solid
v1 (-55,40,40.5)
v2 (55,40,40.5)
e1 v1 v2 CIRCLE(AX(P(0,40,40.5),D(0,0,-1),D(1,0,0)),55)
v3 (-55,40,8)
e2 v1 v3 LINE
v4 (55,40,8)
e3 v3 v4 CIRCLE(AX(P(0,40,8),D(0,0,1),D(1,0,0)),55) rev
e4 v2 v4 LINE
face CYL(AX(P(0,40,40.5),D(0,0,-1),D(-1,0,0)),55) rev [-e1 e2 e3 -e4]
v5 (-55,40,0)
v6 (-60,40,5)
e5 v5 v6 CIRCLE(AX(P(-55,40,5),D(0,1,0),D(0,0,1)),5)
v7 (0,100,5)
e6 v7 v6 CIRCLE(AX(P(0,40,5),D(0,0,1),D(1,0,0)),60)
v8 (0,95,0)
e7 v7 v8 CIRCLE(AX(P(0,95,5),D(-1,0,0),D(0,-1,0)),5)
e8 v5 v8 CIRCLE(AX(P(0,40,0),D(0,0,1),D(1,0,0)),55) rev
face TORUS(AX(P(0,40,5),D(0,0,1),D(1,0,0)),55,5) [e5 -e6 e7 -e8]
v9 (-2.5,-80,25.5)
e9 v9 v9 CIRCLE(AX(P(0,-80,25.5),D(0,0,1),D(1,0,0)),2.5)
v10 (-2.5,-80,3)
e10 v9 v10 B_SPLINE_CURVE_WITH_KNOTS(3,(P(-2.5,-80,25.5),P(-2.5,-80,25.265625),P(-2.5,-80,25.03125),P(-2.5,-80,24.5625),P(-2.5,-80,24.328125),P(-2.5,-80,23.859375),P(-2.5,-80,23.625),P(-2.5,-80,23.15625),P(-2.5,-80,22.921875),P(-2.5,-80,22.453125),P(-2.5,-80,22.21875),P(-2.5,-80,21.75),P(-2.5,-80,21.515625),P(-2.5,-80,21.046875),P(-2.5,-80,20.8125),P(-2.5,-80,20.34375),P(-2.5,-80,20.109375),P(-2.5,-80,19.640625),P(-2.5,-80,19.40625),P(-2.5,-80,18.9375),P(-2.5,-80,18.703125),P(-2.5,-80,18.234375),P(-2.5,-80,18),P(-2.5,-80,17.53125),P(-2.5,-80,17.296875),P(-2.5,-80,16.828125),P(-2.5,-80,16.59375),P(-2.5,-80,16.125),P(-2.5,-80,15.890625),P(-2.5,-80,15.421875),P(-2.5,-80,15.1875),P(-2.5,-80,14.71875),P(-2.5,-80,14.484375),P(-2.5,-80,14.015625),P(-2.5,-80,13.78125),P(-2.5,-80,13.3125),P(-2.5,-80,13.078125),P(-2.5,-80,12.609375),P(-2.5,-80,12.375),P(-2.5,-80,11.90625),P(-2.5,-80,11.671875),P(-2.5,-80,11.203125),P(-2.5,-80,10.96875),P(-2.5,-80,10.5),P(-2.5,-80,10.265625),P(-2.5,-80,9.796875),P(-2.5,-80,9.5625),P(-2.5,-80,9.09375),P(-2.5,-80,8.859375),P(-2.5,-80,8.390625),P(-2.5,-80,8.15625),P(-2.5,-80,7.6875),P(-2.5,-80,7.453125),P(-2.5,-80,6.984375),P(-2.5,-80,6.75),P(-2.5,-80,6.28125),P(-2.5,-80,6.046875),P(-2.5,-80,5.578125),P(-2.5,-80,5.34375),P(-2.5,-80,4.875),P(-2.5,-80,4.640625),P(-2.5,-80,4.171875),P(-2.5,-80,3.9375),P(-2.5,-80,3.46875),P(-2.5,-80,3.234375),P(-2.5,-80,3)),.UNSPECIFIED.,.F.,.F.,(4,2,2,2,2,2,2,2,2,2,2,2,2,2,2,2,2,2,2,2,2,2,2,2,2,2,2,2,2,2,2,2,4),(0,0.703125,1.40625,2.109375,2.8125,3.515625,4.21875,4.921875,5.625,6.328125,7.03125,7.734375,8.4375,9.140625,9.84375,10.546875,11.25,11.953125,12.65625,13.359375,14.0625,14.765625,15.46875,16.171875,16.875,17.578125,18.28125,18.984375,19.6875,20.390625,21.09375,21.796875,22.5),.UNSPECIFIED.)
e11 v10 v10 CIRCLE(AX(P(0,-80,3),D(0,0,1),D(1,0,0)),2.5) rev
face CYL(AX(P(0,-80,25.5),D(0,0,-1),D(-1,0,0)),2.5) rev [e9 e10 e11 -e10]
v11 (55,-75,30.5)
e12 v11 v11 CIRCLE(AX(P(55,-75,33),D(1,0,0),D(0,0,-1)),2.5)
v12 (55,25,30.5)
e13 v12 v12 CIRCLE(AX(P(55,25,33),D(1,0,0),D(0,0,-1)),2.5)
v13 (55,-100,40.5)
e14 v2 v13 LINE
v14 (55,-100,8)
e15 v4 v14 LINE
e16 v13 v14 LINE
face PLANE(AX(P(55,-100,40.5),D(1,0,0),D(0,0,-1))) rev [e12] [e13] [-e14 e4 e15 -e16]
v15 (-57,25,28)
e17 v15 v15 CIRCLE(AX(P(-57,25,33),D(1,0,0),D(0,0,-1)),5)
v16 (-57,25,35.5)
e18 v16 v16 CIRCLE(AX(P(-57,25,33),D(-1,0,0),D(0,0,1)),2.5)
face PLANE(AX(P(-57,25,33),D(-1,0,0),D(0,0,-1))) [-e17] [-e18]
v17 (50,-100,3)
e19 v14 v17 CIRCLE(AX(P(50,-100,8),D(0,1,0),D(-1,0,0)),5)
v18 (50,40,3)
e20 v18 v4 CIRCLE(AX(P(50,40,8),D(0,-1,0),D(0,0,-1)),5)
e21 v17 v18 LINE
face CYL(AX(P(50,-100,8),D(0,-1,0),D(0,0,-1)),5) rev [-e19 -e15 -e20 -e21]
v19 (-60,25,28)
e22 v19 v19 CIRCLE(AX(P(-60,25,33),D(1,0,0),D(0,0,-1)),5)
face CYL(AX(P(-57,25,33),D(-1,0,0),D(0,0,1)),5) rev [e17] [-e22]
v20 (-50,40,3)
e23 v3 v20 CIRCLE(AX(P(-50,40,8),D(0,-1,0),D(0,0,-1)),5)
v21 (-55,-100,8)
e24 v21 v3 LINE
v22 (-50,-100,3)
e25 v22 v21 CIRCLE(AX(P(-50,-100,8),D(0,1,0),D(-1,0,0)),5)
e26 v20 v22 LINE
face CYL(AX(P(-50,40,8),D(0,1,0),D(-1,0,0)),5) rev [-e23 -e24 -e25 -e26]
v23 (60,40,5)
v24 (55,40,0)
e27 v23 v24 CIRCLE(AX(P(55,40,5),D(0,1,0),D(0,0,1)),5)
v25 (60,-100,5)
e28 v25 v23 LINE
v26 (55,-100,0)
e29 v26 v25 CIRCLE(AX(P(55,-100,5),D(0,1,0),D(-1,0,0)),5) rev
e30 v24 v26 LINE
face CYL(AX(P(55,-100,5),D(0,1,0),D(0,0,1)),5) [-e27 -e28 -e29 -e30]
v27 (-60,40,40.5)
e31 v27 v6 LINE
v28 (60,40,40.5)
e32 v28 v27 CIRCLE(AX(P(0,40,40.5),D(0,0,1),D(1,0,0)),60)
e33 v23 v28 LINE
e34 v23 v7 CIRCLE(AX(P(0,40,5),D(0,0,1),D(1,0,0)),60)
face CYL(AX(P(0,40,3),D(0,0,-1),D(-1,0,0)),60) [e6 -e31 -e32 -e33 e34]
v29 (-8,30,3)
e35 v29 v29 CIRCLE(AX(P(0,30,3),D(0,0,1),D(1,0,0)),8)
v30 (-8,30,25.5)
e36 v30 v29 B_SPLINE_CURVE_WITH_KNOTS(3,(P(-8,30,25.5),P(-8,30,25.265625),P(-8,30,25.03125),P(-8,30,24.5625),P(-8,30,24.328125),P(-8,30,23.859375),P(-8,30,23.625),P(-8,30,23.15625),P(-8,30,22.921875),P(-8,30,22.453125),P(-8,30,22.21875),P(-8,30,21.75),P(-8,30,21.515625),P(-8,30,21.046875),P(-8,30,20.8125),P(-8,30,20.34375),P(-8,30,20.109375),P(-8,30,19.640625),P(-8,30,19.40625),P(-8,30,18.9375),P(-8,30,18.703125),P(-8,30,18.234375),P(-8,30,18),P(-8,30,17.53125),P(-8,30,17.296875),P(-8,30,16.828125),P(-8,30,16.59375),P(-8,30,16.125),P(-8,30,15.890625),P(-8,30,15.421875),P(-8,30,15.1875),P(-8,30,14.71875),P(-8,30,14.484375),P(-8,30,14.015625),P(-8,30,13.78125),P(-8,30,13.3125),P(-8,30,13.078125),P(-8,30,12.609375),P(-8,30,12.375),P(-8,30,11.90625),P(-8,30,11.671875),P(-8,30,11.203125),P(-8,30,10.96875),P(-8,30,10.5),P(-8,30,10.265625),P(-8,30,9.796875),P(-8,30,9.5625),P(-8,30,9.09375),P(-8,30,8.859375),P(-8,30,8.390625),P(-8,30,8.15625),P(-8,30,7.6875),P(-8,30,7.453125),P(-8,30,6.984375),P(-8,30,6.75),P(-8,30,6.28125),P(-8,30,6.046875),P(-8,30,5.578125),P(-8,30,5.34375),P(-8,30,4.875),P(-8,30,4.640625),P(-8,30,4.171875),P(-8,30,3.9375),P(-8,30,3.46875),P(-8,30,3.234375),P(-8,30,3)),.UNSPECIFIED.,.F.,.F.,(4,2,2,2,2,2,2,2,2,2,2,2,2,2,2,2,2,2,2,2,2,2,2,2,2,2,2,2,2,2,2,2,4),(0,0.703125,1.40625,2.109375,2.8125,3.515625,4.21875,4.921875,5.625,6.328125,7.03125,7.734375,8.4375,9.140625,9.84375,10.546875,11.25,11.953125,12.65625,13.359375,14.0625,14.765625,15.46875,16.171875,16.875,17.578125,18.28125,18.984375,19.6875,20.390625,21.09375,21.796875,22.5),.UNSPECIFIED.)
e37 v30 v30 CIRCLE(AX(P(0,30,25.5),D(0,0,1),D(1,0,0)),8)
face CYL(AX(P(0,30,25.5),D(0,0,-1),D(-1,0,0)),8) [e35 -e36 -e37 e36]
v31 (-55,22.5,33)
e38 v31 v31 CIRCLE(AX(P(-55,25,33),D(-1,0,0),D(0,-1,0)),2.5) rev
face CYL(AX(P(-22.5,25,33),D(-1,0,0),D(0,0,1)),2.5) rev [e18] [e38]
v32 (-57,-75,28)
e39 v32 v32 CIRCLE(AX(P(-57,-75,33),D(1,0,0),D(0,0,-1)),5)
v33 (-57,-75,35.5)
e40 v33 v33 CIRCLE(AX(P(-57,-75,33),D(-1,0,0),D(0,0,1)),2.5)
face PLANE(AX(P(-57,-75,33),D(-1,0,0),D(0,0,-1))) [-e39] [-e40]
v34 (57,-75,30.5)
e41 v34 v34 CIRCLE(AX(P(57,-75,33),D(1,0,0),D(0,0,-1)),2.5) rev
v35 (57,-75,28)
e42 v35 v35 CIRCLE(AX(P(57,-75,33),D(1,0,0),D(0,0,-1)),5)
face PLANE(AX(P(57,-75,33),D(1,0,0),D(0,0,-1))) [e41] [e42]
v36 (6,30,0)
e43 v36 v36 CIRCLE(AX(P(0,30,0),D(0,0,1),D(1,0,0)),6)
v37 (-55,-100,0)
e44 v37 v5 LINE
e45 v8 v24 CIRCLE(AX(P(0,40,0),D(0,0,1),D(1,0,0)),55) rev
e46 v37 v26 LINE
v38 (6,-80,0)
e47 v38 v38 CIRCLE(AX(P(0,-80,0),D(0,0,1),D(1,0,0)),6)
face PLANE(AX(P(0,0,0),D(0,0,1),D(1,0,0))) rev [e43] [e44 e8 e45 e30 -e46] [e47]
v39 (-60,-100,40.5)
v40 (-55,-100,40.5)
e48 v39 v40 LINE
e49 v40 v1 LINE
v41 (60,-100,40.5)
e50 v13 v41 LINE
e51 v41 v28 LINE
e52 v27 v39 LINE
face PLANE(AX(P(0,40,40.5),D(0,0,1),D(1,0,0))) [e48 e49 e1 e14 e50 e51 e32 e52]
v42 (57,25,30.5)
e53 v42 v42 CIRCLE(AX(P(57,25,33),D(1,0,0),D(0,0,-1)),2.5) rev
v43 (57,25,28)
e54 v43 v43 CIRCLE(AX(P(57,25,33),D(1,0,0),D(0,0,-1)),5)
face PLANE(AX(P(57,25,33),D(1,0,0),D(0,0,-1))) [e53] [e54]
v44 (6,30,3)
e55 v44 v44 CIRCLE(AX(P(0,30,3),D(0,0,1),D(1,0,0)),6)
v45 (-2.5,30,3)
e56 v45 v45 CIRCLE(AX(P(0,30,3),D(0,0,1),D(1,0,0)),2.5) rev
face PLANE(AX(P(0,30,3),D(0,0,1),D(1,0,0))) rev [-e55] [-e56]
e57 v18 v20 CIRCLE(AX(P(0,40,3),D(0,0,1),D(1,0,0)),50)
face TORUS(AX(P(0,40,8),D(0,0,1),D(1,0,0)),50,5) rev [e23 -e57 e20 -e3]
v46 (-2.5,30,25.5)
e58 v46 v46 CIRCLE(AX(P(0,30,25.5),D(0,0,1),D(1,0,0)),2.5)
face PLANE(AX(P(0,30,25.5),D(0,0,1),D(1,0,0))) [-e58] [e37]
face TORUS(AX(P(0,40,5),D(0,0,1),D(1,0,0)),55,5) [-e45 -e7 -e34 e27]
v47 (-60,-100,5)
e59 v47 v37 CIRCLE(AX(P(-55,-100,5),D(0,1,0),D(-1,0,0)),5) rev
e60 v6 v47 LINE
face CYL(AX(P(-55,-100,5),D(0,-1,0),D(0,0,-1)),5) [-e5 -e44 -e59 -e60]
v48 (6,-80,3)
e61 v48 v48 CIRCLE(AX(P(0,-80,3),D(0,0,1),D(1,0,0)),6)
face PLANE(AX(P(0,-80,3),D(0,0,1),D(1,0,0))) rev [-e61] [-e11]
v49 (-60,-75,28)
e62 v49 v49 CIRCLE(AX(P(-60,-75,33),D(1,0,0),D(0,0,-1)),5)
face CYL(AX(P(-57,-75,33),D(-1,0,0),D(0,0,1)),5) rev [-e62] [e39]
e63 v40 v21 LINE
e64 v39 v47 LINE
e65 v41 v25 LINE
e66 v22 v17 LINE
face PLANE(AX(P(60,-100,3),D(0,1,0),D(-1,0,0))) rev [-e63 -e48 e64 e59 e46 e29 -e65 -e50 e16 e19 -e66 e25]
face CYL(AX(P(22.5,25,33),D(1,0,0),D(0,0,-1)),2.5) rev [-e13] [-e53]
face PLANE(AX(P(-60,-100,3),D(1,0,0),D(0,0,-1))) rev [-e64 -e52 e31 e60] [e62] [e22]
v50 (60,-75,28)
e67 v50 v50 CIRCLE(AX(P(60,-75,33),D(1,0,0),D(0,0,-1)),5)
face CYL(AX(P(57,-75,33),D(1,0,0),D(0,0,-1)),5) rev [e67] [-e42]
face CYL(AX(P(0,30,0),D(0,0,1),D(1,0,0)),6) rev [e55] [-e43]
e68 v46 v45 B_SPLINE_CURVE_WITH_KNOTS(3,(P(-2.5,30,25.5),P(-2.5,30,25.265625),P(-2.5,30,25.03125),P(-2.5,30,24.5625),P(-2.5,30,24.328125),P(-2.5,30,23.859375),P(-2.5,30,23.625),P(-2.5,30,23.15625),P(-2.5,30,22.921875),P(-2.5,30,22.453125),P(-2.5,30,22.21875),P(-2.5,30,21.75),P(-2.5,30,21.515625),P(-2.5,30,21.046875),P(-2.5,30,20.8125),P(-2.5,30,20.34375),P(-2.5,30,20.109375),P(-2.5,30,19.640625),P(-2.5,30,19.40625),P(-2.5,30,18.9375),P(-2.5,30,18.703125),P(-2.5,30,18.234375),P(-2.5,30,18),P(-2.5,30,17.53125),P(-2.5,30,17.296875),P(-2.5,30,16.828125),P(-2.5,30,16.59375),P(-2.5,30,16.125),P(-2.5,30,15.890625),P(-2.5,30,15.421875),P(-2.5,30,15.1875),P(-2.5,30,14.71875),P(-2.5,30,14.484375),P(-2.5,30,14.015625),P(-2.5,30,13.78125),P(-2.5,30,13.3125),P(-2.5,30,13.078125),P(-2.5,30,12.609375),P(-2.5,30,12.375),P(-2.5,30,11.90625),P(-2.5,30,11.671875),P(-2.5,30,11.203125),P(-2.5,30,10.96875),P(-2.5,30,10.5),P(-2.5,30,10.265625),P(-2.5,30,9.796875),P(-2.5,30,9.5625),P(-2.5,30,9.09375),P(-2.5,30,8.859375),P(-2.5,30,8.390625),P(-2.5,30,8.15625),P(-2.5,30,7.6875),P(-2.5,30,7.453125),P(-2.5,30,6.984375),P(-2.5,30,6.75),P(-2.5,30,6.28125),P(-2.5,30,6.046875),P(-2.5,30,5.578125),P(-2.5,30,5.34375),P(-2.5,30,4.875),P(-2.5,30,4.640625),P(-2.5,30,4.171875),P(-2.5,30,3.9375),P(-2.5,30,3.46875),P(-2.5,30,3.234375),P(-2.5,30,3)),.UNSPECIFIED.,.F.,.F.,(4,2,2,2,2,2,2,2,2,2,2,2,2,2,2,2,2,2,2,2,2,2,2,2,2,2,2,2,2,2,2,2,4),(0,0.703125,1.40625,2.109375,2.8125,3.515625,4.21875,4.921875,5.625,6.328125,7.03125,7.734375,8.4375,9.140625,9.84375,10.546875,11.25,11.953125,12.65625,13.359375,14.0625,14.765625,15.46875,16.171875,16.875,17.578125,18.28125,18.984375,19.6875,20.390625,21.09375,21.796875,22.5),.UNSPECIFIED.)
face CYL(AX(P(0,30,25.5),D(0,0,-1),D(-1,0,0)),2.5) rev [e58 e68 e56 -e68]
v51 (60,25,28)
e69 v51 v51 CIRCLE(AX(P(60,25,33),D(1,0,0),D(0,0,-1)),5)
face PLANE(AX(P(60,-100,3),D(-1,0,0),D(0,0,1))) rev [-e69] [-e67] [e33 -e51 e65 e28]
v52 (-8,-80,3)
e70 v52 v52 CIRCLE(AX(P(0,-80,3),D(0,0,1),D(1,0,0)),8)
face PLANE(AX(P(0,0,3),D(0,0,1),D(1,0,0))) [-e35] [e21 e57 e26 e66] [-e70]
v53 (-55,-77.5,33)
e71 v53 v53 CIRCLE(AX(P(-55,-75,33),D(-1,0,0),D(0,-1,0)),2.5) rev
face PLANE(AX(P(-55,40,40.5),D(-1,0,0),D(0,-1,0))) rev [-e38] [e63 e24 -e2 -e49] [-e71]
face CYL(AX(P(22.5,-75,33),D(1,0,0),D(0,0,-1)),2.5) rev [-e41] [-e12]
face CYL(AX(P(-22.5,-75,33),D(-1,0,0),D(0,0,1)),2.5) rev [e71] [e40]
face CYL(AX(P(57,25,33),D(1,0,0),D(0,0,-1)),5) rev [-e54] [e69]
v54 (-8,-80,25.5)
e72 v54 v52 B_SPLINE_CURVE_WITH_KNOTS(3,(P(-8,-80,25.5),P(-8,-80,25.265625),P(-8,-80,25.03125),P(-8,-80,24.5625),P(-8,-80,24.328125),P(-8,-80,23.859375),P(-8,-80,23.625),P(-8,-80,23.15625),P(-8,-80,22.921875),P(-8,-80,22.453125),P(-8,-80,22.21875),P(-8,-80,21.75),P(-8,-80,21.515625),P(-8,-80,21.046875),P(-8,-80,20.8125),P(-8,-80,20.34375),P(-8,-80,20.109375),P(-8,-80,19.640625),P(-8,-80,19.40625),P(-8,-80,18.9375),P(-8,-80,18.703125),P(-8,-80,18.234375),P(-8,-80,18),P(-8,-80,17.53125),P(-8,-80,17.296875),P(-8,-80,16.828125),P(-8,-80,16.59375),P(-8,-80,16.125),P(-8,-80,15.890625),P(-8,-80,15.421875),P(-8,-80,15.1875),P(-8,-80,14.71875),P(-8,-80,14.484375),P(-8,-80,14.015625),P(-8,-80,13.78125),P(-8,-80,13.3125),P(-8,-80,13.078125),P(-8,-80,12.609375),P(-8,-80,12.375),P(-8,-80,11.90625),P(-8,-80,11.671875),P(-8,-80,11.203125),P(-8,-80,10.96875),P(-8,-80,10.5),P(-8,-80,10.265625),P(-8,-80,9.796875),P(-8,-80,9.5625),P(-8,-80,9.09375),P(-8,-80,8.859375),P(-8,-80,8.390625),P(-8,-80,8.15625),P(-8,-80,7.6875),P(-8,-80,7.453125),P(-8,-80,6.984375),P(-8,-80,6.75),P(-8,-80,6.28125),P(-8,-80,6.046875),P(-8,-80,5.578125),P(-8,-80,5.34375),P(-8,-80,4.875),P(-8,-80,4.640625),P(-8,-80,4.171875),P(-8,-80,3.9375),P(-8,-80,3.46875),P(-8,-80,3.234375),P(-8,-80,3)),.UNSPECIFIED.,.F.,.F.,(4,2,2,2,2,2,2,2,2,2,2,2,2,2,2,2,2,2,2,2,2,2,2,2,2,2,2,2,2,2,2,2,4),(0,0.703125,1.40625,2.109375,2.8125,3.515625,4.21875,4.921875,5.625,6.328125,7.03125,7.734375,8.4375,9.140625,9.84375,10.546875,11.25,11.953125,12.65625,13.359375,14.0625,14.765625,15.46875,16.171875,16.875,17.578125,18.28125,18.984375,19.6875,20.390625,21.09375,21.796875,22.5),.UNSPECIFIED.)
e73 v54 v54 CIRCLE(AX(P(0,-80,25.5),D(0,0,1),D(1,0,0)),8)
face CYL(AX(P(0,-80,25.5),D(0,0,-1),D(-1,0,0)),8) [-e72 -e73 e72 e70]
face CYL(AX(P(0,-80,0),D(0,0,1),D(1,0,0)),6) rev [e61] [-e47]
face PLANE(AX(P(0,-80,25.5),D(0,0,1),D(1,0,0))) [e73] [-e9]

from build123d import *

# Parameters (mm, degrees)
SKETCH1_W           = 120
SKETCH1_H           = 200
BOSS_EXTRUDE1_DEPTH = 3
FILLET1_R           = 60
BOSS_EXTRUDE2_DEPTH = 37.5
FILLET2_R           = 5
SKETCH6_R           = 2.5
CUT_EXTRUDE1_DEPTH  = 37.5
SKETCH7_R           = 5
CUT_EXTRUDE2_DEPTH  = 3
SKETCH9_R           = 8
SKETCH9_R_2         = 2.5
BOSS_EXTRUDE3_DEPTH = 22.5
SKETCH10_R          = 6
CUT_EXTRUDE3_DEPTH  = 3
LPATTERN1_COUNT     = 2
LPATTERN1_PITCH     = 110


with BuildPart() as part:
    # Sketch1 → Boss-Extrude1 (new body)
    with BuildSketch(Plane.XY):
        Rectangle(SKETCH1_W, SKETCH1_H)
    extrude(amount=BOSS_EXTRUDE1_DEPTH)

    # Fillet1
    fillet1_edges = [part.edges().sort_by_distance(p)[0] for p in [
        (60, 100, 1.5),
        (-60, 100, 1.5),
    ]]
    fillet(fillet1_edges, radius=FILLET1_R - 0.0001)  # a hair under: the kernel refuses the full size

    # Sketch4 → Boss-Extrude2 (add)
    with BuildSketch(Plane.XY.offset(3)):
        with BuildLine():
            Line((55, -100), (55, 40))
            ThreePointArc((55, 40), (38.890872965, 78.890872965), (0, 95))
            ThreePointArc((0, 95), (-38.890872965, 78.890872965), (-55, 40))
            Line((-55, 40), (-55, -100))
            Line((-55, -100), (-60, -100))
            Line((-60, -100), (-60, 40))
            ThreePointArc((-60, 40), (-42.426406871, 82.426406871), (0, 100))
            ThreePointArc((0, 100), (42.426406871, 82.426406871), (60, 40))
            Line((60, 40), (60, -100))
            Line((60, -100), (55, -100))
        make_face()
    extrude(amount=BOSS_EXTRUDE2_DEPTH)

    # Fillet2
    fillet2_edges = [part.edges().sort_by_distance(p)[0] for p in [
        (-60, -29.99995, 0),
        (-42.426436161, 82.426436161, 0),
        (-55, -30, 3),
        (0, 95, 3),
        (55, -30, 3),
        (60, -29.99995, 0),
    ]]
    fillet(fillet2_edges, radius=FILLET2_R)

    # Sketch6 → Cut-Extrude1 (cut)
    with BuildSketch(Plane(origin=(60, 0, 0), x_dir=(0, 0, -1), z_dir=(1, 0, 0))):
        with Locations((-33, -75)):
            Circle(SKETCH6_R)
        with Locations((-33, 25)):
            Circle(SKETCH6_R)
    cut_extrude1 = extrude(amount=-CUT_EXTRUDE1_DEPTH, mode=Mode.SUBTRACT)

    # Sketch7 → Cut-Extrude2 (cut)
    with BuildSketch(Plane(origin=(60, 0, 0), x_dir=(0, 0, -1), z_dir=(1, 0, 0))):
        with Locations((-33, 25)):
            Circle(SKETCH7_R)
        with Locations((-33, -75)):
            Circle(SKETCH7_R)
    cut_extrude2 = extrude(amount=-CUT_EXTRUDE2_DEPTH, mode=Mode.SUBTRACT)

    # Mirror1: Cut-Extrude1, Cut-Extrude2 across plane
    add(cut_extrude1.mirror(Plane(origin=(0, 0, 0), x_dir=(0, 0, 1), z_dir=(1, 0, 0))), mode=Mode.SUBTRACT)
    add(cut_extrude2.mirror(Plane(origin=(0, 0, 0), x_dir=(0, 0, 1), z_dir=(1, 0, 0))), mode=Mode.SUBTRACT)

    # Sketch9 → Boss-Extrude3 (add)
    with BuildSketch(Plane.XY.offset(3)):
        with Locations(Location((0, 30, 0), (0, 0, 180))):
            Circle(SKETCH9_R)
        with Locations(Location((0, 30, 0), (0, 0, 180))):
            Circle(SKETCH9_R_2, mode=Mode.SUBTRACT)
    boss_extrude3 = extrude(amount=BOSS_EXTRUDE3_DEPTH)

    # Sketch10 → Cut-Extrude3 (cut)
    with BuildSketch(Plane.XY.offset(3)):
        with Locations((0, 30)):
            Circle(SKETCH10_R)
    cut_extrude3 = extrude(amount=-CUT_EXTRUDE3_DEPTH, mode=Mode.SUBTRACT)

    # LPattern1: Boss-Extrude3, Cut-Extrude3 ×2
    with Locations(*[(0, -i * LPATTERN1_PITCH, 0) for i in range(1, LPATTERN1_COUNT)]):
        add(boss_extrude3)
        add(cut_extrude3, mode=Mode.SUBTRACT)


solid = part.part
